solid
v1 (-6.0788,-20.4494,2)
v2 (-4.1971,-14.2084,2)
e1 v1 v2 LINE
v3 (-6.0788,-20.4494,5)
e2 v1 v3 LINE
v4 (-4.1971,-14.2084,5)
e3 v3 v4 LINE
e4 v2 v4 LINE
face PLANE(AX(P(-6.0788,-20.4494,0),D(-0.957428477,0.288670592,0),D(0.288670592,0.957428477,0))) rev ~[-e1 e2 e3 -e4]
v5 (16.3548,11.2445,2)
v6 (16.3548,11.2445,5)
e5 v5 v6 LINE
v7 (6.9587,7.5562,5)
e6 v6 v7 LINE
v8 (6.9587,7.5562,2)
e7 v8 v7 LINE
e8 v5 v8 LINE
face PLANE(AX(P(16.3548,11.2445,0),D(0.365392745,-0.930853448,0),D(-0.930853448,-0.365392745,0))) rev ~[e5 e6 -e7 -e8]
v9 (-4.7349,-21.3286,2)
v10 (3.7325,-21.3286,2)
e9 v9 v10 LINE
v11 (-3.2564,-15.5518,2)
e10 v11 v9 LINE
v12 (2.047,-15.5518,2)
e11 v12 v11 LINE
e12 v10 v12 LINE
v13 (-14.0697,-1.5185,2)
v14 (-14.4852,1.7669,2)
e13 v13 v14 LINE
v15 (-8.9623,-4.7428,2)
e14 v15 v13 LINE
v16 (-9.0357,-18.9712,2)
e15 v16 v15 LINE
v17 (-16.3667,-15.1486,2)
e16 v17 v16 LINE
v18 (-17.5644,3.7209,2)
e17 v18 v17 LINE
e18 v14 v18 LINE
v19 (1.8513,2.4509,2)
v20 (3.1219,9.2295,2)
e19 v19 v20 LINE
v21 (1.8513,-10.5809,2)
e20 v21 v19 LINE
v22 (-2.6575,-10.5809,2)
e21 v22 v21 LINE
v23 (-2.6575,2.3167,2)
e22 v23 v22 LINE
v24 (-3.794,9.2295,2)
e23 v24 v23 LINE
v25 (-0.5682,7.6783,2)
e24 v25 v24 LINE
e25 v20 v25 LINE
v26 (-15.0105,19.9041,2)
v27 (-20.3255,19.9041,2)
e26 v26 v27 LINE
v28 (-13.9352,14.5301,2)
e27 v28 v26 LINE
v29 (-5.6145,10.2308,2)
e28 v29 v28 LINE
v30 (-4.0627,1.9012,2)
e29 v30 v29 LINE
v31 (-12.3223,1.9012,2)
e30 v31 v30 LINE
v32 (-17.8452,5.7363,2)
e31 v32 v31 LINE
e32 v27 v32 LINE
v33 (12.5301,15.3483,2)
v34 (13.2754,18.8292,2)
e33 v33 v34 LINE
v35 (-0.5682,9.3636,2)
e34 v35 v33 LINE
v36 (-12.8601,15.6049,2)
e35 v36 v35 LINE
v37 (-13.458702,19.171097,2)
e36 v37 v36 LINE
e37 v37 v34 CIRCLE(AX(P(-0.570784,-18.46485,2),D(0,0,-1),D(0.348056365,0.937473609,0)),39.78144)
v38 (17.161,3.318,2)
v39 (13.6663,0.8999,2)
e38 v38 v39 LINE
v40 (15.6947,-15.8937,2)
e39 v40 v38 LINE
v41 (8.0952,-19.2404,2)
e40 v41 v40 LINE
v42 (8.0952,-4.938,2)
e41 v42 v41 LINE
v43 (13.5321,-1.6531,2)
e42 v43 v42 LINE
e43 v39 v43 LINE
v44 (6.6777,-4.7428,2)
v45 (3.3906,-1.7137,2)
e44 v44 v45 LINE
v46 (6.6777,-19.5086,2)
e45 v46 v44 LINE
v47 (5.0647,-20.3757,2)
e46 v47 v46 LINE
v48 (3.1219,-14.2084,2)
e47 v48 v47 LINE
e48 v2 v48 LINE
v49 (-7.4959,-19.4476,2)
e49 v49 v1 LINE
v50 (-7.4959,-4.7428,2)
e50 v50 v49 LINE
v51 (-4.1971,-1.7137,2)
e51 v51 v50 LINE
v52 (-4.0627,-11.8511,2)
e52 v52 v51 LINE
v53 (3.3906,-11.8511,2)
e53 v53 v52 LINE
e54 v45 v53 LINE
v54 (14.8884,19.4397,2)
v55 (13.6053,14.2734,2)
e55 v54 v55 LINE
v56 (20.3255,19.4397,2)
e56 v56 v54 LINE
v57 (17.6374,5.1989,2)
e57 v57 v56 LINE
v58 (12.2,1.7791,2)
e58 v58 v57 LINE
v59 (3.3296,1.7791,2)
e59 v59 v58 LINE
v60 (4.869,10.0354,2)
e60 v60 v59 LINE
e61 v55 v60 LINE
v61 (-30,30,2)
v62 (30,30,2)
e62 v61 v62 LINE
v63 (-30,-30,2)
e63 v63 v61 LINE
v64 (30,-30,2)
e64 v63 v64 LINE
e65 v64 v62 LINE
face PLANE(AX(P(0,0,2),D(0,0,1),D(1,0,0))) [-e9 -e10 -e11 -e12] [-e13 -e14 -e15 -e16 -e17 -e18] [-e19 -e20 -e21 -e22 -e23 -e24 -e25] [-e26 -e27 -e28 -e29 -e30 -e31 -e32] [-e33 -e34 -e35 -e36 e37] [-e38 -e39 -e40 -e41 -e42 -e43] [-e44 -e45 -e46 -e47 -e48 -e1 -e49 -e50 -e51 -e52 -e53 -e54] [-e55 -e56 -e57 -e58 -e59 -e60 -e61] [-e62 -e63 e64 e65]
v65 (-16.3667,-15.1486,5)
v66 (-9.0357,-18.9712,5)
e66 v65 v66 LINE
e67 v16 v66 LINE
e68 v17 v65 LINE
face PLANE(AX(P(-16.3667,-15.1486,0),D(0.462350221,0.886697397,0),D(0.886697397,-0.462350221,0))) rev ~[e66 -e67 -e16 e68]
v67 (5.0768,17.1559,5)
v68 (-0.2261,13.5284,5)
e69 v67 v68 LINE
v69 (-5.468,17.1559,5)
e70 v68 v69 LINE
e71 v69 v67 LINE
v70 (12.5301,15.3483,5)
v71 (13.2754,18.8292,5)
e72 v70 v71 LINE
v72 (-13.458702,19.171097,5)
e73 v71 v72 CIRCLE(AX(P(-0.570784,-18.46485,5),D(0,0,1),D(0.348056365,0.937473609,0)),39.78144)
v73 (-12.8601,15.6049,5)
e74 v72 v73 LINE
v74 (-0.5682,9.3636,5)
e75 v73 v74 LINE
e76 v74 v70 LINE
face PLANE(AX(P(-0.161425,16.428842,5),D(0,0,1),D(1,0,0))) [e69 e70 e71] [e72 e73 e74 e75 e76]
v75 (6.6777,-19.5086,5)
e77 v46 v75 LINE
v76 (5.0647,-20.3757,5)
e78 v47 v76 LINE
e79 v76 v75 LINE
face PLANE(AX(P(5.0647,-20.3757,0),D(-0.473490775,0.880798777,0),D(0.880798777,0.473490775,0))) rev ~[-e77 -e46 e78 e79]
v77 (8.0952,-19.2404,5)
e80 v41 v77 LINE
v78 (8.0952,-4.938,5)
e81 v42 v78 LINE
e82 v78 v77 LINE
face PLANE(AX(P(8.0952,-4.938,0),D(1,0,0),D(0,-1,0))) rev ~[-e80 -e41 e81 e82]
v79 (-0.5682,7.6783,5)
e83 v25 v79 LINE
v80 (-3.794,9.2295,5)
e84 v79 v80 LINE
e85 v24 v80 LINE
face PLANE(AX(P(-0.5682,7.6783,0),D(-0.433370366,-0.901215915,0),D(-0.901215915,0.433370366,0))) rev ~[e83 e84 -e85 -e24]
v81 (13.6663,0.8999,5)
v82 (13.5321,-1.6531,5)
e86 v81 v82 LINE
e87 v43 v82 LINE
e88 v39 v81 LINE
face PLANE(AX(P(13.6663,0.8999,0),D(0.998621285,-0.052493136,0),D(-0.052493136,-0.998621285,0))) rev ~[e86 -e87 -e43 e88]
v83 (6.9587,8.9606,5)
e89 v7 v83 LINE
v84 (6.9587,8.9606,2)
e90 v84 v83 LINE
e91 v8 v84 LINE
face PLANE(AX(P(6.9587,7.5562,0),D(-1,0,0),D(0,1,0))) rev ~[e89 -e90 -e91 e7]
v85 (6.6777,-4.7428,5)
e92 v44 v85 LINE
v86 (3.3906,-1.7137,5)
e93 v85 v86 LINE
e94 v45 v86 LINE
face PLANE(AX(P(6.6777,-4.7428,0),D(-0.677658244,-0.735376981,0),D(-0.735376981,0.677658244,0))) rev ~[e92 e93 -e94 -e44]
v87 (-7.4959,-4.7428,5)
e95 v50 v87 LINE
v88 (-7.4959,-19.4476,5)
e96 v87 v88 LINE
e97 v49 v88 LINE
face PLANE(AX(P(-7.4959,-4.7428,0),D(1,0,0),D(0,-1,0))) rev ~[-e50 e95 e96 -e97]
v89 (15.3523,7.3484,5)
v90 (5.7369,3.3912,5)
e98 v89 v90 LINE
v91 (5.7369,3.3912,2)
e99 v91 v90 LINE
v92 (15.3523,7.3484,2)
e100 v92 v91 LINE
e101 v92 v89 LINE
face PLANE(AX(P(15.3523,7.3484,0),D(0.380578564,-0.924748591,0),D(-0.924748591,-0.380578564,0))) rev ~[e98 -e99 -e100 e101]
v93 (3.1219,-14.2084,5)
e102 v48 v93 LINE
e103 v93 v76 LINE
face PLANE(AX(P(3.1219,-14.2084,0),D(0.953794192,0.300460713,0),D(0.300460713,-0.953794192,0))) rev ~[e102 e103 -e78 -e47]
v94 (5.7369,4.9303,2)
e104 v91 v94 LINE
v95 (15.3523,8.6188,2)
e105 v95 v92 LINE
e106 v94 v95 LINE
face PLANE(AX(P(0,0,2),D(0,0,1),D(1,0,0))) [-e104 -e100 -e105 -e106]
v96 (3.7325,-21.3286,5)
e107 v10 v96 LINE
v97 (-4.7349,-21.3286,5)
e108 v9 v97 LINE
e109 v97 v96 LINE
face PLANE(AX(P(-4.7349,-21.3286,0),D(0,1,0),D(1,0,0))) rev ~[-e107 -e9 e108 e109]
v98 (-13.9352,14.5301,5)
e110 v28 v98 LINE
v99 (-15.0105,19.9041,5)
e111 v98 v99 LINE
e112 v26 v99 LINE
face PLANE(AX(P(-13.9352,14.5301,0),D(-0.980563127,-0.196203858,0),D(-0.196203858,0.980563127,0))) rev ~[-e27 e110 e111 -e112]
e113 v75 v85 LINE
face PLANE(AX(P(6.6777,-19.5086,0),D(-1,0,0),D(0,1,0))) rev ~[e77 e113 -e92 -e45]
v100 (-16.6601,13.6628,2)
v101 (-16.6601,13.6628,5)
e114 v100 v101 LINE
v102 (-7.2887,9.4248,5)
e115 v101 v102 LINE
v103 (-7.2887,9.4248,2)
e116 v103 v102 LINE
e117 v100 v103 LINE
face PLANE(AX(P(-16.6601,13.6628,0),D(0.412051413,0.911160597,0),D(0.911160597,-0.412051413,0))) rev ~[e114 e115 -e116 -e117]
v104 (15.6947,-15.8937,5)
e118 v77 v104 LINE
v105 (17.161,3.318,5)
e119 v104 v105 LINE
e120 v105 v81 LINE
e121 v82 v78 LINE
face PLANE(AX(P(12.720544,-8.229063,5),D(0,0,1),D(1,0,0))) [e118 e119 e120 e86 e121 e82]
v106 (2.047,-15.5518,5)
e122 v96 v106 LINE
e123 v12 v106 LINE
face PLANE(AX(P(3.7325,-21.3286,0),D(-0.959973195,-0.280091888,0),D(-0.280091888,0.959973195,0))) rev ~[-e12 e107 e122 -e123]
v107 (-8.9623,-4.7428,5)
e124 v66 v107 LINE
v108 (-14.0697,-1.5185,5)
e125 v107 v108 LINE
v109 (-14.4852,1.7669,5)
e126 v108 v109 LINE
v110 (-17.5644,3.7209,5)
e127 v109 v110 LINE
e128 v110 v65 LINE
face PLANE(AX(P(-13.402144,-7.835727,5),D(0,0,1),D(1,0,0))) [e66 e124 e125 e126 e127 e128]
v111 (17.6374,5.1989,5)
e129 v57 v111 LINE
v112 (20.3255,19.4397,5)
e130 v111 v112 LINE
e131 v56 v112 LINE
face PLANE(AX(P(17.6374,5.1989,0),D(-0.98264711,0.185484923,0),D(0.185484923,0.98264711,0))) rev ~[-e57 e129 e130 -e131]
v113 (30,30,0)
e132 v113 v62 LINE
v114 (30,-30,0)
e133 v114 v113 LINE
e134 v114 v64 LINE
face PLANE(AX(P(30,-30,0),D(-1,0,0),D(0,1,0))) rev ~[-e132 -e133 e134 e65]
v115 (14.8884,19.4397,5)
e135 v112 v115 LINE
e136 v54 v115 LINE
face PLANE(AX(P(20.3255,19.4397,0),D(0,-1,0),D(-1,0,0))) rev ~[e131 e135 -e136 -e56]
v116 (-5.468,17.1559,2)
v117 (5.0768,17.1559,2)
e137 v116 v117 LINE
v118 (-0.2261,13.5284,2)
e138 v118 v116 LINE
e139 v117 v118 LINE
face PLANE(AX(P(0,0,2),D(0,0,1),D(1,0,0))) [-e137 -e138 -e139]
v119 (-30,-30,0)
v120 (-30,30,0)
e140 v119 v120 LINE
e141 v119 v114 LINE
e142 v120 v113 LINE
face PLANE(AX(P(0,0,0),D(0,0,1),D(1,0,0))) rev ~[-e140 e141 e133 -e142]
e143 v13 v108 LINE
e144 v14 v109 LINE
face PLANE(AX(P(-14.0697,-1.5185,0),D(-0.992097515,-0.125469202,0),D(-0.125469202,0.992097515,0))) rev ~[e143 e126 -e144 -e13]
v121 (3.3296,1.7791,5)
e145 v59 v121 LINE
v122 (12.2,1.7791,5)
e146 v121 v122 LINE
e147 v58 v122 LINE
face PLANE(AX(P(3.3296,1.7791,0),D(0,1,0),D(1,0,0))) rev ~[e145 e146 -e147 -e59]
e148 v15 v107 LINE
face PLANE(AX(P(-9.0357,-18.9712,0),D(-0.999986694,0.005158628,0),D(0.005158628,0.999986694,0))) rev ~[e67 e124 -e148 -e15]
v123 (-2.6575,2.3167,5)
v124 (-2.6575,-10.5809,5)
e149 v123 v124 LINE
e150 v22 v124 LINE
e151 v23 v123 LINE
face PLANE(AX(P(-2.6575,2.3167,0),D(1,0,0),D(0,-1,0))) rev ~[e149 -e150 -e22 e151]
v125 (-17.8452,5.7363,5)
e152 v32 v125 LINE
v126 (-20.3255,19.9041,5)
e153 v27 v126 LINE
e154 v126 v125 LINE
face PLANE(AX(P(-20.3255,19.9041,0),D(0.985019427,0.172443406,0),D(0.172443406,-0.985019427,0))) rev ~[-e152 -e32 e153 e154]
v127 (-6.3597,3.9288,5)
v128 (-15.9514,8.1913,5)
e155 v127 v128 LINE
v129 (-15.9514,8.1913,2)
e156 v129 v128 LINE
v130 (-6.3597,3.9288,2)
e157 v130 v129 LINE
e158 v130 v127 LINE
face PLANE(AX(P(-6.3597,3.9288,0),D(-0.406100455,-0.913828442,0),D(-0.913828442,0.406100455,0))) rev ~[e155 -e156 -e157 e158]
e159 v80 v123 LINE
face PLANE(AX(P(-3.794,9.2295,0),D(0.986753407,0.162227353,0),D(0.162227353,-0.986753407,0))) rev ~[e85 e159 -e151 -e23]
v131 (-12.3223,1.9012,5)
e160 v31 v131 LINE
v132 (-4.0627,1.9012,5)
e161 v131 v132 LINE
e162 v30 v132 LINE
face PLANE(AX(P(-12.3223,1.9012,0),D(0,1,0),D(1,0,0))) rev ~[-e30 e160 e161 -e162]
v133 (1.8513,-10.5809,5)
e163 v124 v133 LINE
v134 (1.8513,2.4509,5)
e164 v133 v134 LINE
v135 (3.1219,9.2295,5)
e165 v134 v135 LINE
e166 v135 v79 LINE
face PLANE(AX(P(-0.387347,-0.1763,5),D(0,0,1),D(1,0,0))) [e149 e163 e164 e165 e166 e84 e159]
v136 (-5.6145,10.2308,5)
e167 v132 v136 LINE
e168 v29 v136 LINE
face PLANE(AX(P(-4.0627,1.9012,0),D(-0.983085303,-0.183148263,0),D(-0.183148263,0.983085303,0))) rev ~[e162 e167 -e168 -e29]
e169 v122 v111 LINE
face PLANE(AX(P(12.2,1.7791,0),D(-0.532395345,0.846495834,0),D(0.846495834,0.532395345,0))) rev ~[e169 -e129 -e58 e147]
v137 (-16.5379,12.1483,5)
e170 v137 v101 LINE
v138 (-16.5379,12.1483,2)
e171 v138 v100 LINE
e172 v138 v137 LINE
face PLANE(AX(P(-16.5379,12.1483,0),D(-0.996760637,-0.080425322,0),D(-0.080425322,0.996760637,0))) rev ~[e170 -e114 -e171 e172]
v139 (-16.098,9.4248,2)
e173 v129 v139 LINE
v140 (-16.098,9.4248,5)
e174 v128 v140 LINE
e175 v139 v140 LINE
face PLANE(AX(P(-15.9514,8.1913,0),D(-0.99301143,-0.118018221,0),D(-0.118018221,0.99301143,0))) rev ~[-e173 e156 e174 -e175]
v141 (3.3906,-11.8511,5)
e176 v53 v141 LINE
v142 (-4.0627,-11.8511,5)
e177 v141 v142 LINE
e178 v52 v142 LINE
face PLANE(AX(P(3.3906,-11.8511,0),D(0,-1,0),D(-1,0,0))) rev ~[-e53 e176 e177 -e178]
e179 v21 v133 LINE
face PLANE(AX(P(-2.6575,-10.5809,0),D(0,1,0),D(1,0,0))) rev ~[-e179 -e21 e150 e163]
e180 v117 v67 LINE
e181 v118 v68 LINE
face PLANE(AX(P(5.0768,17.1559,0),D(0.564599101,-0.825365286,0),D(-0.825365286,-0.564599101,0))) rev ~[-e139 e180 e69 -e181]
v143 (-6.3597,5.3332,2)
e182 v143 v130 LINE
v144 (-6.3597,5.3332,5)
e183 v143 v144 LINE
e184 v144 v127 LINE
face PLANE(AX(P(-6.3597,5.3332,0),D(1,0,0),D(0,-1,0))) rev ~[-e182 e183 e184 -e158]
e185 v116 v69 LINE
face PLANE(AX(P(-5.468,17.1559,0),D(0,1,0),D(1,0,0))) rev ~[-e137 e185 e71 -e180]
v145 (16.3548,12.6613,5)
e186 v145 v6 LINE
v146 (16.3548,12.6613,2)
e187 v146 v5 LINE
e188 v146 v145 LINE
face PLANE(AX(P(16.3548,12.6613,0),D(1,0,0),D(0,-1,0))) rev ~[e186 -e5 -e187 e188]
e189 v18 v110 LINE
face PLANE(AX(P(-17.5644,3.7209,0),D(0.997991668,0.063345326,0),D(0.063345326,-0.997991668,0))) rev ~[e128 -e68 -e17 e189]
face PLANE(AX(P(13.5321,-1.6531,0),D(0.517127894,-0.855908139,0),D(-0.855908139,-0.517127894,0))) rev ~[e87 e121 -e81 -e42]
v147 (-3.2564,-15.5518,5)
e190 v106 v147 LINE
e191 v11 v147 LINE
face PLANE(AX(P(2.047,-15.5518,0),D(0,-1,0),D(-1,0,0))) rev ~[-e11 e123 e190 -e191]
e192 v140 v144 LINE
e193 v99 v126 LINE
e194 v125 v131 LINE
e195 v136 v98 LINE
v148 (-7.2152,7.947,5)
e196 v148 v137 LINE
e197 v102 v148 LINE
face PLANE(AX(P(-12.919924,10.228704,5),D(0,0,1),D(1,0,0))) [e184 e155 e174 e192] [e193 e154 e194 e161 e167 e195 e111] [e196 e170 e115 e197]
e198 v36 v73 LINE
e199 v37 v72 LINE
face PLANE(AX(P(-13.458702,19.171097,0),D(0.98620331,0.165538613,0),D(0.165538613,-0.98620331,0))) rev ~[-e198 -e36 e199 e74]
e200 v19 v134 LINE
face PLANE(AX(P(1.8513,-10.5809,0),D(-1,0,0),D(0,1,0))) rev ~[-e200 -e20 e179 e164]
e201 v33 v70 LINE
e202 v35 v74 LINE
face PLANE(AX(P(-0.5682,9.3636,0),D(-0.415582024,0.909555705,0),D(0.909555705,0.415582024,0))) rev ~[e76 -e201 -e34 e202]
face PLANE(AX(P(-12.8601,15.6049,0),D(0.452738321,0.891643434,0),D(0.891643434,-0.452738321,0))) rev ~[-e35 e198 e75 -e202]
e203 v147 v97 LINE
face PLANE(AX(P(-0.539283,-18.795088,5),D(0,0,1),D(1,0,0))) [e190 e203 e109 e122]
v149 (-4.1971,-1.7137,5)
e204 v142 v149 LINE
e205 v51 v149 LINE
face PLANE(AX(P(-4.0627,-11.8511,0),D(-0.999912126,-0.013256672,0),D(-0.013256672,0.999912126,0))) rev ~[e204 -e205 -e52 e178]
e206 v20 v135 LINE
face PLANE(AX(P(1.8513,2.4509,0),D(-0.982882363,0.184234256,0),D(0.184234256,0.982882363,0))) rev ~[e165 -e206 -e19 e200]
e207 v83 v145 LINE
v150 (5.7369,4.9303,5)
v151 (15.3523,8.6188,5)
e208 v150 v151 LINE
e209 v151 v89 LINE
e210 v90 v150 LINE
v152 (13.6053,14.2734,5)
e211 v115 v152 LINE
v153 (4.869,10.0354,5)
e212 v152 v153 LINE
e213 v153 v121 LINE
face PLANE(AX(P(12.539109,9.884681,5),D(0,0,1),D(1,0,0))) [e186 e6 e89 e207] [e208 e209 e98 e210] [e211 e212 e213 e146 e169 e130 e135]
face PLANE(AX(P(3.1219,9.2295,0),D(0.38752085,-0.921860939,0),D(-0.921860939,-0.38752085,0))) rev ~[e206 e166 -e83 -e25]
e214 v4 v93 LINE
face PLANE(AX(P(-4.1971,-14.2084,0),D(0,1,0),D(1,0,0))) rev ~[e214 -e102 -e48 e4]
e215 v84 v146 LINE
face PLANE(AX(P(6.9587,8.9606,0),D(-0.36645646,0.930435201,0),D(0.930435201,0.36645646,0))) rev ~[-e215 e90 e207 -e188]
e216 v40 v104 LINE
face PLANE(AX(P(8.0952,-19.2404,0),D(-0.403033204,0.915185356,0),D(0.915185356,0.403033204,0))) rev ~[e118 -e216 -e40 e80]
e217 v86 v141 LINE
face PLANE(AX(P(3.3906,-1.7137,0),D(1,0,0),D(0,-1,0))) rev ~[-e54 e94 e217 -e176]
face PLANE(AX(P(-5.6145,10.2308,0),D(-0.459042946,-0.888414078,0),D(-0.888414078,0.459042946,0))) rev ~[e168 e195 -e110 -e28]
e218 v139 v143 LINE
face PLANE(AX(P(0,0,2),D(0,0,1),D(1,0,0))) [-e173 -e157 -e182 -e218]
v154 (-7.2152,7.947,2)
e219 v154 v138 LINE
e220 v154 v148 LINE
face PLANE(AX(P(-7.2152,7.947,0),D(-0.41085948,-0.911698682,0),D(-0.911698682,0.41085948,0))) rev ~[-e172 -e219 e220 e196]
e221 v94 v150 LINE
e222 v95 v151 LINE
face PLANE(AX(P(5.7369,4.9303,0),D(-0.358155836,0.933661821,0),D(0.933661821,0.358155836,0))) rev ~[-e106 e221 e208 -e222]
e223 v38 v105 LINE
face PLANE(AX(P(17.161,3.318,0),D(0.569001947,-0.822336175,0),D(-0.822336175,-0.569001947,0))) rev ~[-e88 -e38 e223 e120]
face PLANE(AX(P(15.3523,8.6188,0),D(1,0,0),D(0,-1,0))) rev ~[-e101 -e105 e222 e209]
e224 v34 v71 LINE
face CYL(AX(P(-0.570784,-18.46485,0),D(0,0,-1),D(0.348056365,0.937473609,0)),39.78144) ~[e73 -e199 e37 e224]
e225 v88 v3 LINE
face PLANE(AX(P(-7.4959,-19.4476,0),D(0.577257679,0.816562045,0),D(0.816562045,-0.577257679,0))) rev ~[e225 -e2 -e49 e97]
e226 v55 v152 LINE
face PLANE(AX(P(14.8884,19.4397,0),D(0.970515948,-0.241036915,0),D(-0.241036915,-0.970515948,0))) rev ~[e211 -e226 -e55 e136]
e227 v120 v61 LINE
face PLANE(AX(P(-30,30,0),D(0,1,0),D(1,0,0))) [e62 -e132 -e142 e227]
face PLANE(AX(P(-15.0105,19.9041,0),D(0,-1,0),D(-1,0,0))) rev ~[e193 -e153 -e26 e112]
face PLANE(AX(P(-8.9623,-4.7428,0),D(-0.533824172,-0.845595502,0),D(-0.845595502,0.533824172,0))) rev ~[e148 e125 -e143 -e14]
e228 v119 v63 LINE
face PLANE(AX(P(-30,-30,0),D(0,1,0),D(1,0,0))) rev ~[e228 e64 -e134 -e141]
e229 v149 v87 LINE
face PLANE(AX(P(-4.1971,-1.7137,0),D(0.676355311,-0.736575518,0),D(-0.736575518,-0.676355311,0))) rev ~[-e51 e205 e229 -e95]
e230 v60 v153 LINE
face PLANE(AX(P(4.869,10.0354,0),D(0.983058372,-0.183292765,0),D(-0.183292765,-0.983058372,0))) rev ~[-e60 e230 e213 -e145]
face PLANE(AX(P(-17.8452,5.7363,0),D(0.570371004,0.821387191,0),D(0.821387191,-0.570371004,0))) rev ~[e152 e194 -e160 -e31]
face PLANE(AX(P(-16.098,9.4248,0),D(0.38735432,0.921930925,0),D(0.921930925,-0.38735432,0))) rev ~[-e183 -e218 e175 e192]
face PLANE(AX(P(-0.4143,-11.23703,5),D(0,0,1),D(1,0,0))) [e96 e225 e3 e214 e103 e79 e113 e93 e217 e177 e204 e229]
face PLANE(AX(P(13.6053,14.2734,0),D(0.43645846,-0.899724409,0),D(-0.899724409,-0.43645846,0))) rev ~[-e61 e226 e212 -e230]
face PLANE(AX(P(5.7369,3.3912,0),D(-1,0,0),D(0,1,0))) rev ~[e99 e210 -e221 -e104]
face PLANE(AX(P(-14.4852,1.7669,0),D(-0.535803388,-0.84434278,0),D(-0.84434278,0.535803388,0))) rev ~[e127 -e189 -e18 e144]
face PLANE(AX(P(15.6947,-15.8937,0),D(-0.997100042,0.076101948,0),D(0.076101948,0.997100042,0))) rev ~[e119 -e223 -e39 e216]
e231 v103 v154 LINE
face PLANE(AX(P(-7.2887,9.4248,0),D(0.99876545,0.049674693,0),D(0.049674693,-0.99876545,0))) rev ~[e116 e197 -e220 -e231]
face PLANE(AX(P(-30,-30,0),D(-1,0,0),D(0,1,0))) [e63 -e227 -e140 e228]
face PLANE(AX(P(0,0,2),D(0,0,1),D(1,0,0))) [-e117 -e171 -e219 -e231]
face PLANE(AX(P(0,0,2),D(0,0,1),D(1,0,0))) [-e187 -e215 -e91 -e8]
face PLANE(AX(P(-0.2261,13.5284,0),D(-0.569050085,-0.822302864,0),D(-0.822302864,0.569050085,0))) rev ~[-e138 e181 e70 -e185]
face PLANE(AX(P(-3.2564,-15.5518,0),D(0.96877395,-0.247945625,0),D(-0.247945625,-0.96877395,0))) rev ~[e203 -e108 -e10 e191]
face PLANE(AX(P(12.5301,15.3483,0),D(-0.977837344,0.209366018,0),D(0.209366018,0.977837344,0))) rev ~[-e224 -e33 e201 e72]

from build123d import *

# Parameters (mm, degrees)
F2_DEPTH = 5
F1_W     = 60
F1_H     = 60
F3_DEPTH = 2


# Not quite as in the source:
# - ends of sketch curves that miss each other by under 0.0002 mm in the source are joined


with BuildPart() as f2:
    # F0 (on Top) → F2 (new body)
    with BuildSketch(Plane.XY):
        with BuildLine():
            Line((12.5301, 15.3483), (13.2754, 18.8292))
            ThreePointArc((13.2754, 18.8292), (-0.0620714554, 21.313337159), (-13.4587020592, 19.1710971727))
            Line((-13.4587020592, 19.1710971727), (-12.8601, 15.6049))
            Line((-12.8601, 15.6049), (-0.5682, 9.3636))
            Line((-0.5682, 9.3636), (12.5301, 15.3483))
        make_face()
        Polygon((5.0768, 17.1559), (-0.2261, 13.5284), (-5.468, 17.1559), align=None, mode=Mode.SUBTRACT)
    extrude(amount=F2_DEPTH)



with BuildPart() as f2b:
    # F0 (on Top) → F2, piece 2 (new body)
    with BuildSketch(Plane.XY):
        Polygon((20.3255, 19.4397), (14.8884, 19.4397), (13.6053, 14.2734), (4.869, 10.0354), (3.3296, 1.7791), (12.2, 1.7791), (17.6374, 5.1989), align=None)
        Polygon((15.3523, 8.6188), (15.3523, 7.3484), (5.7369, 3.3912), (5.7369, 4.9303), align=None, mode=Mode.SUBTRACT)
        Polygon((16.3548, 12.6613), (16.3548, 11.2445), (6.9587, 7.5562), (6.9587, 8.9606), align=None, mode=Mode.SUBTRACT)
    extrude(amount=F2_DEPTH)


with BuildPart() as f2c:
    # F0 (on Top) → F2, piece 3 (new body)
    with BuildSketch(Plane.XY):
        Polygon((-4.0627, 1.9012), (-5.6145, 10.2308), (-13.9352, 14.5301), (-15.0105, 19.9041), (-20.3255, 19.9041), (-17.8452, 5.7363), (-12.3223, 1.9012), align=None)
        Polygon((-16.098, 9.4248), (-6.3597, 5.3332), (-6.3597, 3.9288), (-15.9514, 8.1913), align=None, mode=Mode.SUBTRACT)
        Polygon((-16.6601, 13.6628), (-7.2887, 9.4248), (-7.2152, 7.947), (-16.5379, 12.1483), align=None, mode=Mode.SUBTRACT)
    extrude(amount=F2_DEPTH)


with BuildPart() as f2d:
    # F0 (on Top) → F2, piece 4 (new body)
    with BuildSketch(Plane.XY):
        Polygon((-14.0697, -1.5185), (-14.4852, 1.7669), (-17.5644, 3.7209), (-16.3667, -15.1486), (-9.0357, -18.9712), (-8.9623, -4.7428), align=None)
    extrude(amount=F2_DEPTH)


with BuildPart() as f2e:
    # F0 (on Top) → F2, piece 5 (new body)
    with BuildSketch(Plane.XY):
        Polygon((17.161, 3.318), (13.6663, 0.8999), (13.5321, -1.6531), (8.0952, -4.938), (8.0952, -19.2404), (15.6947, -15.8937), align=None)
    extrude(amount=F2_DEPTH)


with BuildPart() as f2f:
    # F0 (on Top) → F2, piece 6 (new body)
    with BuildSketch(Plane.XY):
        Polygon((-3.794, 9.2295), (-2.6575, 2.3167), (-2.6575, -10.5809), (1.8513, -10.5809), (1.8513, 2.4509), (3.1219, 9.2295), (-0.5682, 7.6783), align=None)
    extrude(amount=F2_DEPTH)


with BuildPart() as f2g:
    # F0 (on Top) → F2, piece 7 (new body)
    with BuildSketch(Plane.XY):
        Polygon((-7.4959, -4.7428), (-7.4959, -19.4476), (-6.0788, -20.4494), (-4.1971, -14.2084), (3.1219, -14.2084), (5.0647, -20.3757), (6.6777, -19.5086), (6.6777, -4.7428), (3.3906, -1.7137), (3.3906, -11.8511), (-4.0627, -11.8511), (-4.1971, -1.7137), align=None)
    extrude(amount=F2_DEPTH)


with BuildPart() as f2h:
    # F0 (on Top) → F2, piece 8 (new body)
    with BuildSketch(Plane.XY):
        Polygon((-3.2564, -15.5518), (-4.7349, -21.3286), (3.7325, -21.3286), (2.047, -15.5518), align=None)
    extrude(amount=F2_DEPTH)


with BuildPart() as f2_1:
    add(f2.part)

    add(f2b.part)  # F3 merges F2b

    add(f2c.part)  # F3 merges F2c

    add(f2d.part)  # F3 merges F2d

    add(f2e.part)  # F3 merges F2e

    add(f2f.part)  # F3 merges F2f

    add(f2g.part)  # F3 merges F2g

    add(f2h.part)  # F3 merges F2h
    # F1 (on Top) → F3 (join)
    with BuildSketch(Plane.XY):
        Rectangle(F1_W, F1_H)
    extrude(amount=F3_DEPTH)


solid = f2_1.part
